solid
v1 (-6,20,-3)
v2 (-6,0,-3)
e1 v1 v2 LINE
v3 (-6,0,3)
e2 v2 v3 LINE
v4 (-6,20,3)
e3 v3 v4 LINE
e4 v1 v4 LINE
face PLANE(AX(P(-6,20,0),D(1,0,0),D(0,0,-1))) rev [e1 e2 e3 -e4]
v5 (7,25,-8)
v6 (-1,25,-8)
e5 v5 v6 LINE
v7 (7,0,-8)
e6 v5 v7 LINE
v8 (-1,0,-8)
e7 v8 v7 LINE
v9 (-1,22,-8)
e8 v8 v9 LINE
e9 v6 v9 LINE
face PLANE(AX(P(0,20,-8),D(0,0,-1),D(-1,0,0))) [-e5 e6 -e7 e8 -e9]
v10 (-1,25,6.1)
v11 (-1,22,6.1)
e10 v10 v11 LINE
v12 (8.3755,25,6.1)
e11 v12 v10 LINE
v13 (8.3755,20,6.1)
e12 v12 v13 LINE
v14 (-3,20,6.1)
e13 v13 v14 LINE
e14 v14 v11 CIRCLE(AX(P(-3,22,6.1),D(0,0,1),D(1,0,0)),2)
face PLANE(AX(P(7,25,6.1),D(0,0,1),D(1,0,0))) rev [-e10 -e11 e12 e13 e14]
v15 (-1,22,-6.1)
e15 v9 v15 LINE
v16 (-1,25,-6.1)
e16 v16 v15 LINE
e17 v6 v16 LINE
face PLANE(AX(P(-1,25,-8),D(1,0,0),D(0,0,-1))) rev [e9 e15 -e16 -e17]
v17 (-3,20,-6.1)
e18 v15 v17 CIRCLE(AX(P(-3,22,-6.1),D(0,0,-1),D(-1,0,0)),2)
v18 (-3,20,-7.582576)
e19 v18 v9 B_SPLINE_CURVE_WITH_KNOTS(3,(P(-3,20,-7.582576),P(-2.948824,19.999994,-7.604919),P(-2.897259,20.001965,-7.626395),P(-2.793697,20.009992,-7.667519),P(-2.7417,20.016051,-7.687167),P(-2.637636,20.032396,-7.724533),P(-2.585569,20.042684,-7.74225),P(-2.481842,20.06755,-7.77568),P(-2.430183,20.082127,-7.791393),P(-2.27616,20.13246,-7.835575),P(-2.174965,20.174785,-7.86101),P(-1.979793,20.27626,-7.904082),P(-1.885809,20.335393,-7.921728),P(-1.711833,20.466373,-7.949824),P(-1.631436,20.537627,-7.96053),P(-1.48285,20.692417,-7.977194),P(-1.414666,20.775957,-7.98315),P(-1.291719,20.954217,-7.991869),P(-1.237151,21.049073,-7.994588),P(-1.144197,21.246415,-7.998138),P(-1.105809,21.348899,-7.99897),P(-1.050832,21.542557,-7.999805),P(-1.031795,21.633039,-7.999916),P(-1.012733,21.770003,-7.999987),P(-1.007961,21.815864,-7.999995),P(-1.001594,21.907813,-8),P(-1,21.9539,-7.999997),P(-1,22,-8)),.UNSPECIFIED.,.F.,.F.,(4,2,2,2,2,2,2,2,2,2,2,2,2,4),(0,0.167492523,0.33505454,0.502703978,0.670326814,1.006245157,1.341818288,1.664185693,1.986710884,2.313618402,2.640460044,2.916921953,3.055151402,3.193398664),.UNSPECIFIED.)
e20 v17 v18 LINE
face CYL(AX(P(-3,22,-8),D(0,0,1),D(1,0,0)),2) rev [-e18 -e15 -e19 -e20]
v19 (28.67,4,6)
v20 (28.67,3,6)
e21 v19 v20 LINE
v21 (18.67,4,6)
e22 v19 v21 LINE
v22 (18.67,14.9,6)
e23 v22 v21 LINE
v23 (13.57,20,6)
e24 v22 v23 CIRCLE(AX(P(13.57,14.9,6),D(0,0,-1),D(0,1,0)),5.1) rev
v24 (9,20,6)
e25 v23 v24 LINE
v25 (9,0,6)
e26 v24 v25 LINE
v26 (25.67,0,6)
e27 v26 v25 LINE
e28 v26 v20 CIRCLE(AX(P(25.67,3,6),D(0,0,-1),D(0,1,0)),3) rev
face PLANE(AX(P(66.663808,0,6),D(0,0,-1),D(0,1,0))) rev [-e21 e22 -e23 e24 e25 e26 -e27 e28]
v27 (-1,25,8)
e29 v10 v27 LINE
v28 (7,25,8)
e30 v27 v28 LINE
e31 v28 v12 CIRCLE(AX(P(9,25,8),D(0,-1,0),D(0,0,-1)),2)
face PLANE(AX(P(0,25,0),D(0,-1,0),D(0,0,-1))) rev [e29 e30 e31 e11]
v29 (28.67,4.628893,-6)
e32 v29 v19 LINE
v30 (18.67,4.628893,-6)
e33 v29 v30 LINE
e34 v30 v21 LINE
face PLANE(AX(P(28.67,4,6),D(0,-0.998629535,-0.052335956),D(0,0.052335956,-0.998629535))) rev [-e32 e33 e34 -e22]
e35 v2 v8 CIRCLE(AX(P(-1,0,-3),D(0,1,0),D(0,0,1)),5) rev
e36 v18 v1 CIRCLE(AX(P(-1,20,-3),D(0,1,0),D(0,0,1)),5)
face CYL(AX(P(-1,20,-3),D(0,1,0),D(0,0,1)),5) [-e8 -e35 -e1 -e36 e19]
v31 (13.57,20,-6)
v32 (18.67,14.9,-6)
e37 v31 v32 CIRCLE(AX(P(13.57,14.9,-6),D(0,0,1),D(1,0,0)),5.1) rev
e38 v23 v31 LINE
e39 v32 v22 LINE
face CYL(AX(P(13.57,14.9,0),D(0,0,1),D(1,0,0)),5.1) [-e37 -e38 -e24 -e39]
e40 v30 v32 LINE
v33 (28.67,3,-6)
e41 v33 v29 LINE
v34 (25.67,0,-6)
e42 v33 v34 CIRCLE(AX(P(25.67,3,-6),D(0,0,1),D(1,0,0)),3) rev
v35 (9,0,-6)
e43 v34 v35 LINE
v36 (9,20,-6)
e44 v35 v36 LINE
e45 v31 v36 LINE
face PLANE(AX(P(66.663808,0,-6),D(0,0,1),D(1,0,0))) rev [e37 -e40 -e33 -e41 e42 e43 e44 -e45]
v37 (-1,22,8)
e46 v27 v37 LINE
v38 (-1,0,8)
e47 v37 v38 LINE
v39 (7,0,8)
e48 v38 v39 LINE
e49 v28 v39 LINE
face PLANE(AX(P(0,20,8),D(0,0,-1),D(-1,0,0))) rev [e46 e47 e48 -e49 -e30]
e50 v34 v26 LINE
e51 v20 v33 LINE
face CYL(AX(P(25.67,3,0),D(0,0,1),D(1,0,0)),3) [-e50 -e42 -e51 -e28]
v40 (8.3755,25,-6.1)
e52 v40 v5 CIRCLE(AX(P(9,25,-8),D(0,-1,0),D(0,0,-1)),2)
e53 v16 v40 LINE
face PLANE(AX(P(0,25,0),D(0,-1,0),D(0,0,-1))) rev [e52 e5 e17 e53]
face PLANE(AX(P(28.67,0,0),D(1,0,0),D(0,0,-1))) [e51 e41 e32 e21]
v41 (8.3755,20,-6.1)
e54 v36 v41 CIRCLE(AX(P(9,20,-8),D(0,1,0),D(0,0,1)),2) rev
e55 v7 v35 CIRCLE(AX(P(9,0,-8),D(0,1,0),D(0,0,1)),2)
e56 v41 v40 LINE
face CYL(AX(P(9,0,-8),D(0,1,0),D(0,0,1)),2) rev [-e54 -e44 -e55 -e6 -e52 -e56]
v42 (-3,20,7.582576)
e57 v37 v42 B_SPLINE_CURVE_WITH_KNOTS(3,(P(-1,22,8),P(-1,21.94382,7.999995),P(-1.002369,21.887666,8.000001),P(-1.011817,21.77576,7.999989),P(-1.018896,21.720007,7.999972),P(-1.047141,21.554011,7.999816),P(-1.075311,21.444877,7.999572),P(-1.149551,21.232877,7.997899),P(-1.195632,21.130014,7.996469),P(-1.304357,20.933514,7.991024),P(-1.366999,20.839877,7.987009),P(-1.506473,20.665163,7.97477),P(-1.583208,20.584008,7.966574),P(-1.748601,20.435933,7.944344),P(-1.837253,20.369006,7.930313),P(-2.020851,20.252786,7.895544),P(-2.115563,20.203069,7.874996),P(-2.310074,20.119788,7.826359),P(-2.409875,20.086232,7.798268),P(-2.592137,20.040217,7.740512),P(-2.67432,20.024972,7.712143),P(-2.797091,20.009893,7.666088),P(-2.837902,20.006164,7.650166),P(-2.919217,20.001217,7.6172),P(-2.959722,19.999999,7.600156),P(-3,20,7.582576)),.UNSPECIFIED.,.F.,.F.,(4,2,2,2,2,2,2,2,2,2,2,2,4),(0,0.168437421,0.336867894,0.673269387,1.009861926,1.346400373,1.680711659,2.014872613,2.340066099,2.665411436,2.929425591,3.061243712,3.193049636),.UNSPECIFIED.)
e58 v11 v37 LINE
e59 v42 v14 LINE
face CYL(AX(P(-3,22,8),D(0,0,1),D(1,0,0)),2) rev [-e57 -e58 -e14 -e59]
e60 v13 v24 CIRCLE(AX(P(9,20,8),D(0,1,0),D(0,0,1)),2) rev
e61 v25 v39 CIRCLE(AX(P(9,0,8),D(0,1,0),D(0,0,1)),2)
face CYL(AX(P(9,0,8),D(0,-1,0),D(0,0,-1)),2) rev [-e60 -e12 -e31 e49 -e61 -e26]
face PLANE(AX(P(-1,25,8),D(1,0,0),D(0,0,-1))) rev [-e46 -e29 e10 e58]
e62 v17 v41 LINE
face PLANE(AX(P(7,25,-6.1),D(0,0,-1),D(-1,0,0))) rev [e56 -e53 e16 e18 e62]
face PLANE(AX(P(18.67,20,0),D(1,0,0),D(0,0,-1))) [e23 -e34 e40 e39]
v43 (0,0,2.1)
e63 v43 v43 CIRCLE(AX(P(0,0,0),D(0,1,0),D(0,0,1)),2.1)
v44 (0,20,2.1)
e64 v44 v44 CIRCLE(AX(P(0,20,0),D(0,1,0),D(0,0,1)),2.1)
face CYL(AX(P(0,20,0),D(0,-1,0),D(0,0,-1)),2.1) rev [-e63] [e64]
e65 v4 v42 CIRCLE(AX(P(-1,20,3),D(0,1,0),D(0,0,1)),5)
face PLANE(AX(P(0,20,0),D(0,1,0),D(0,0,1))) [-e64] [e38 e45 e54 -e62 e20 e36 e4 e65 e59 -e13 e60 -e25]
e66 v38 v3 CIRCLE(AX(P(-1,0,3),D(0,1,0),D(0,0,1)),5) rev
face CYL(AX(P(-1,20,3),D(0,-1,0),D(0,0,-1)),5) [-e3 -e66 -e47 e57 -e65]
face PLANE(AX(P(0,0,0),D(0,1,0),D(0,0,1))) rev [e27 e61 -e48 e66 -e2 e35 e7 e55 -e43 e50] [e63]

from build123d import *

# Parameters (mm, degrees)
SKETCH1_W           = 12
SKETCH1_H           = 16
SKETCH1_R           = 2.1
SKETCH1_W_2         = 1
BOSS_EXTRUDE1_DEPTH = 20
FILLET1_R           = 5
SKETCH2_W           = 8
SKETCH2_H           = 1.9
BOSS_EXTRUDE2_DEPTH = 5
SKETCH4_W           = 12
SKETCH4_H           = 20
BOSS_EXTRUDE3_DEPTH = 11.67
FILLET2_R           = 5.1
FILLET4_R           = 2
FILLET6_R           = 2
BOSS_EXTRUDE4_DEPTH = 10
FILLET7_R           = 3


with BuildPart() as part:
    # Sketch1 → Boss-Extrude1 (new body)
    # profile 1 of 2: a face of its own
    with BuildSketch(Plane(origin=(0, 0, 0), x_dir=(1, 0, 0), z_dir=(0, 1, 0))):
        Rectangle(SKETCH1_W, SKETCH1_H)
        with Locations(Location((0, 0, 0), (0, 0, 270))):
            Circle(SKETCH1_R, mode=Mode.SUBTRACT)
    # profile 2 of 2: a face of its own
    with BuildSketch(Plane(origin=(0, 0, 0), x_dir=(1, 0, 0), z_dir=(0, 1, 0))):
        with Locations((6.5, 0)):
            Rectangle(SKETCH1_W_2, SKETCH1_H)
    extrude(amount=BOSS_EXTRUDE1_DEPTH)

    # Fillet1
    fillet1_edges = [part.edges().sort_by_distance(p)[0] for p in [
        (-6, 10, 8),
        (-6, 10, -8),
    ]]
    fillet(fillet1_edges, radius=FILLET1_R)

    # Sketch2 → Boss-Extrude2 (add)
    with BuildSketch(Plane(origin=(0, 20, 0), x_dir=(1, 0, 0), z_dir=(0, 1, 0))):
        with Locations((3, 7.05)):
            Rectangle(SKETCH2_W, SKETCH2_H)
        with Locations((3, -7.05)):
            Rectangle(SKETCH2_W, SKETCH2_H)
    extrude(amount=BOSS_EXTRUDE2_DEPTH)

    # Sketch4 → Boss-Extrude3 (add)
    with BuildSketch(Plane(origin=(7, 0, 0), x_dir=(0, 0, -1), z_dir=(1, 0, 0))):
        with Locations((0, 10)):
            Rectangle(SKETCH4_W, SKETCH4_H)
    extrude(amount=BOSS_EXTRUDE3_DEPTH)

    # Fillet2
    fillet2_edges = [part.edges().sort_by_distance(p)[0] for p in [
        (18.67, 20, 0),
    ]]
    fillet(fillet2_edges, radius=FILLET2_R)

    # Fillet4
    fillet4_edges = [part.edges().sort_by_distance(p)[0] for p in [
        (-1, 20, -7.05),
        (-1, 20, 7.05),
    ]]
    fillet(fillet4_edges, radius=FILLET4_R)

    # Fillet6
    fillet6_edges = [part.edges().sort_by_distance(p)[0] for p in [
        (7, 10, -6),
        (7, 10, 6),
    ]]
    fillet(fillet6_edges, radius=FILLET6_R - 0.0001)  # a hair under: the kernel refuses the full size

    # Sketch5 → Boss-Extrude4 (add)
    with BuildSketch(Plane(origin=(18.67, 0, 0), x_dir=(0, 0, -1), z_dir=(1, 0, 0))):
        Polygon((-6, 4), (6, 4.628893351), (6, 0), (-6, 0), align=None)
    extrude(amount=BOSS_EXTRUDE4_DEPTH)

    # Fillet7
    fillet7_edges = [part.edges().sort_by_distance(p)[0] for p in [
        (28.67, 0, 0),
    ]]
    fillet(fillet7_edges, radius=FILLET7_R)


solid = part.part
